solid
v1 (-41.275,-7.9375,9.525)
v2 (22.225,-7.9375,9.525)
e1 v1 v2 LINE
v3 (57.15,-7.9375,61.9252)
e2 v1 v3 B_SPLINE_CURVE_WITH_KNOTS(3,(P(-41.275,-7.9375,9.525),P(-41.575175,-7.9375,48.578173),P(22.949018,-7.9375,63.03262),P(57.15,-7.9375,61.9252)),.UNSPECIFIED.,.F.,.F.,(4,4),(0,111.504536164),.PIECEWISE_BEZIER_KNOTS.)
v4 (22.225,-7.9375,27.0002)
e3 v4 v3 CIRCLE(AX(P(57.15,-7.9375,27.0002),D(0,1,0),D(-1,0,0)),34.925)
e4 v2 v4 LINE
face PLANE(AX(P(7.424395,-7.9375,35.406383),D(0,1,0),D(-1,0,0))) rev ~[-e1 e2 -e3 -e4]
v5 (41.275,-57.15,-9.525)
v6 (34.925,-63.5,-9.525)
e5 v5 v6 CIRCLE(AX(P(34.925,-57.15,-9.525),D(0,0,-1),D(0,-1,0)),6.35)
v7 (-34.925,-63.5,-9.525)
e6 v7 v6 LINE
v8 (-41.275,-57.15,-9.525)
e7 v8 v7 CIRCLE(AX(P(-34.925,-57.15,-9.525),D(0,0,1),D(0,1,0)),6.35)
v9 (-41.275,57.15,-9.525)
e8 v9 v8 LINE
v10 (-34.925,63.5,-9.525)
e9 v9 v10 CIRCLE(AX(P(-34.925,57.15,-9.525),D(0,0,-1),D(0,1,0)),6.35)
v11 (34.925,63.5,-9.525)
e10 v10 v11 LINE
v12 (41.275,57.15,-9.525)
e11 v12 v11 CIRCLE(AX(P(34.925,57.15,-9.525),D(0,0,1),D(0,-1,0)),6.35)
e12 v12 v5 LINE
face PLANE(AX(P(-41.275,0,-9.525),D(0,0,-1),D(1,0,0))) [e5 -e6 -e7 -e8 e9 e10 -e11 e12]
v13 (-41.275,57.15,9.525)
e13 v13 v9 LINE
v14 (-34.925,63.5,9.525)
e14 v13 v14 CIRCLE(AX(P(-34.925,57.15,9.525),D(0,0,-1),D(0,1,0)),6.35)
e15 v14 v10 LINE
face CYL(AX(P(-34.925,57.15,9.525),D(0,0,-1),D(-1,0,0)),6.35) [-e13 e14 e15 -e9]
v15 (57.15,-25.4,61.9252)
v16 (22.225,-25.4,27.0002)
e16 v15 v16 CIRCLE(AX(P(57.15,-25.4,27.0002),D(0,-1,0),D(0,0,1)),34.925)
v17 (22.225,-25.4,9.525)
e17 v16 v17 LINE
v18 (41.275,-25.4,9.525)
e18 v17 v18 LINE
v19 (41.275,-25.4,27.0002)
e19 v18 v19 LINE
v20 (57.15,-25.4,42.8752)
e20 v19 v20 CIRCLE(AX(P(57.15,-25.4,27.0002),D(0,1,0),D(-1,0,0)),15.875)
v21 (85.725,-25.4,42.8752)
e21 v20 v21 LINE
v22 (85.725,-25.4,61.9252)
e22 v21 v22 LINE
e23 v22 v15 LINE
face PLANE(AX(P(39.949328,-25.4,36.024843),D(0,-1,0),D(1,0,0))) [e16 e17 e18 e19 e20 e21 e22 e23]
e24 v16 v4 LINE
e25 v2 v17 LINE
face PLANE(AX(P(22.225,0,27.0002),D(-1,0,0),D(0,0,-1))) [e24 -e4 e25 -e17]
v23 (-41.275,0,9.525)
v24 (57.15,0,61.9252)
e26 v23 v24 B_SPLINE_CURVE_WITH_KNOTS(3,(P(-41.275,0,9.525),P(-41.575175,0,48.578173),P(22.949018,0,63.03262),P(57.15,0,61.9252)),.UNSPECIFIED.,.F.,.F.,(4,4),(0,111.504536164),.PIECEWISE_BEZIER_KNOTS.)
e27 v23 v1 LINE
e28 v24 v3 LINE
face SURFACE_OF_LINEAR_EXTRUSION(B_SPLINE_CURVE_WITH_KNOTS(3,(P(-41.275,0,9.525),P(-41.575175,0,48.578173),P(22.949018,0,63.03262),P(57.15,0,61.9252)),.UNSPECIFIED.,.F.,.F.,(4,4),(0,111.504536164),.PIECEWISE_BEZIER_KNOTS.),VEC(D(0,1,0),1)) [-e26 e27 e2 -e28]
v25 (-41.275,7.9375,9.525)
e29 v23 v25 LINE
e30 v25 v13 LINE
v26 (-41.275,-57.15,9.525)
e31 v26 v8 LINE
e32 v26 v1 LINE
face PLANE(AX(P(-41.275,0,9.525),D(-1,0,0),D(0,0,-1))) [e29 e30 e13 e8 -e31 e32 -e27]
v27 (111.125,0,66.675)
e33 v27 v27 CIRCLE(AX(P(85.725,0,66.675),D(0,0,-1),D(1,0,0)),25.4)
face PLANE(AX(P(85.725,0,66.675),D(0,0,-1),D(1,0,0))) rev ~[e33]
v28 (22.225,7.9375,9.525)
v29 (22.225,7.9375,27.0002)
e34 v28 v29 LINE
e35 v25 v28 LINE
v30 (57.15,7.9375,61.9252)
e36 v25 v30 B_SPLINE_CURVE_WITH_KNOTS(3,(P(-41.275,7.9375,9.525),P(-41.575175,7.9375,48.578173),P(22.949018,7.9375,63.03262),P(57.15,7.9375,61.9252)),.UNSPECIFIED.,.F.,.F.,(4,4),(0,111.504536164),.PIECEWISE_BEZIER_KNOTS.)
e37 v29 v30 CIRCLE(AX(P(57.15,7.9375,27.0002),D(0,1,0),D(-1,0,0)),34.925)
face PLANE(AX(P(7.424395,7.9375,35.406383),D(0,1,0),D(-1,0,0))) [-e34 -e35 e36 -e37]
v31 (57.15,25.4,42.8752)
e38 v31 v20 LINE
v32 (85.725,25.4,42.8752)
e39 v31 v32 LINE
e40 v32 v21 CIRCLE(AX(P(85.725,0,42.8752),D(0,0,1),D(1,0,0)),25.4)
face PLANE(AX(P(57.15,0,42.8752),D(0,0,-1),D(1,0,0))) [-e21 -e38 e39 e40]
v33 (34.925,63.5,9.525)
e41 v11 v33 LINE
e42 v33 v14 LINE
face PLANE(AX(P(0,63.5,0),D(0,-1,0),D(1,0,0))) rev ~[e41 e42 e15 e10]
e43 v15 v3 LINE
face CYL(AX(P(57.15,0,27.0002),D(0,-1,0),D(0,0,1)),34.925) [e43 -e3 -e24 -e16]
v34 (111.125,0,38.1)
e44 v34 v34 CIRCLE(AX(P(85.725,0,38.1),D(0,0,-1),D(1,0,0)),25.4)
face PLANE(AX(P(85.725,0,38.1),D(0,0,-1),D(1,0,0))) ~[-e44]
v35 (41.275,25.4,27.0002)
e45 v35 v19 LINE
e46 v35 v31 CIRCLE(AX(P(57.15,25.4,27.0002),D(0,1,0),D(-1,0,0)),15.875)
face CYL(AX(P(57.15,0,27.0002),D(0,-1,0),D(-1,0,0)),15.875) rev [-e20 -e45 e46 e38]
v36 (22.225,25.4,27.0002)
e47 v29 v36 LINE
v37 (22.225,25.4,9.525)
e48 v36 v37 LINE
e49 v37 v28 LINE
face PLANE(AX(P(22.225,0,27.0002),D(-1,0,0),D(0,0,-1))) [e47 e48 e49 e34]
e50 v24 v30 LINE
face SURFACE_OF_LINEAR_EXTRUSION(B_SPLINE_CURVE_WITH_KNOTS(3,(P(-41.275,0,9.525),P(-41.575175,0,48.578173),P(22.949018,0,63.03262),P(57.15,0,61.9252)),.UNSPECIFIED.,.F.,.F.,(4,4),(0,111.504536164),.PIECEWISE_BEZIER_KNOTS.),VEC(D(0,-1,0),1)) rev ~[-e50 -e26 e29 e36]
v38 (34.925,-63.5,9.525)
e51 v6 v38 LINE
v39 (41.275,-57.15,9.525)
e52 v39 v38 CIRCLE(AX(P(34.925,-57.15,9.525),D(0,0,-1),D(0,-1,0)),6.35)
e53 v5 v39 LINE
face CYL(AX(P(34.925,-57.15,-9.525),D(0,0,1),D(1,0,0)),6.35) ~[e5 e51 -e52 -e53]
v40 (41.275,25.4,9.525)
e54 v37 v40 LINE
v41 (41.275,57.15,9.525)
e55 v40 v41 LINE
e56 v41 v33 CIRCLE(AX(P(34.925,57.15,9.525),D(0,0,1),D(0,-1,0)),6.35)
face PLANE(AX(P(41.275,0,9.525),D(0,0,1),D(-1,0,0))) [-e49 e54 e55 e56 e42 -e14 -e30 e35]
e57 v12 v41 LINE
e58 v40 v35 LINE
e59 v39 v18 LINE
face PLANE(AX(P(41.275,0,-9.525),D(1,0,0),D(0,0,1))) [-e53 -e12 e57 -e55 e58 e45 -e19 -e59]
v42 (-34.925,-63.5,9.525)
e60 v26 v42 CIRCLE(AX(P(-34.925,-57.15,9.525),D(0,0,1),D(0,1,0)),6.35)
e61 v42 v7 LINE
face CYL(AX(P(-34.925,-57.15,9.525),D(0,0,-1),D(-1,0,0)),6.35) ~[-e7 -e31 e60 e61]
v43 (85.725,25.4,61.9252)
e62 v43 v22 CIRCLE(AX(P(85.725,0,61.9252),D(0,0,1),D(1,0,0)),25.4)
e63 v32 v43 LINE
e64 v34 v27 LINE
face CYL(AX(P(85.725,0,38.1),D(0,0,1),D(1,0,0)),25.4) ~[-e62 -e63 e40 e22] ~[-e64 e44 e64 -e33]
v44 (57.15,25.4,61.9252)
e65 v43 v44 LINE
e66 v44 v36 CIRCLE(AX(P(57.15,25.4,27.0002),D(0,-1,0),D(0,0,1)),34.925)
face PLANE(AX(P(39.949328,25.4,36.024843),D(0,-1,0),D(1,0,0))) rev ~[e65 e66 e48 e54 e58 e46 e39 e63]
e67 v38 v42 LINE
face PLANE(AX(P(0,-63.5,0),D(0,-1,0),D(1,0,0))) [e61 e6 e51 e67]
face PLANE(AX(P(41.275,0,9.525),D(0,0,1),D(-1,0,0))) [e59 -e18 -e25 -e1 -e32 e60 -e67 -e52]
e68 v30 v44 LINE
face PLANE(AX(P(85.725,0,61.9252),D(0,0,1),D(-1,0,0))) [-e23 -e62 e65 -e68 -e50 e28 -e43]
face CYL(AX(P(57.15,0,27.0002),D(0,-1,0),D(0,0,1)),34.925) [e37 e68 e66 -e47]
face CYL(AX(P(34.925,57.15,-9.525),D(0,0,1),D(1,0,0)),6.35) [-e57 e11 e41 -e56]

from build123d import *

# Parameters (mm, degrees)
F1_DEPTH = 63.5
F2_DEPTH = 25.4
F3_DEPTH = 7.9375
F5_R     = 6.35


with BuildPart() as f1:
    # F0 (on Front) → F1 (new body, symmetric)
    with BuildSketch(Plane.XZ):
        Polygon((22.225, 9.525), (-41.275, 9.525), (-41.275, -9.525), (41.275, -9.525), (41.275, 9.525), align=None)
    extrude(amount=F1_DEPTH, both=True)

    # F0 (on Front) → F2 (join, symmetric)
    with BuildSketch(Plane.XZ):
        with BuildLine():
            Line((22.225, 27.0002), (22.225, 9.525))
            Line((22.225, 9.525), (41.275, 9.525))
            Line((41.275, 9.525), (41.275, 27.0002))
            ThreePointArc((41.275, 27.0002), (45.9246798487, 38.2255201513), (57.15, 42.8752))
            Line((57.15, 42.8752), (60.325, 42.8752))
            Line((60.325, 42.8752), (60.325, 61.9252))
            Line((60.325, 61.9252), (57.15, 61.9252))
            ThreePointArc((57.15, 61.9252), (32.4542956671, 51.6959043329), (22.225, 27.0002))
        make_face()
        Polygon((85.725, 61.9252), (60.325, 61.9252), (60.325, 42.8752), (85.725, 42.8752), (85.725, 52.3875), align=None)
    extrude(amount=F2_DEPTH, both=True)

    # F0 (on Front) → F3 (join, symmetric)
    with BuildSketch(Plane.XZ):
        with BuildLine():
            add(Edge.make_bspline(
                [(-41.275, 9.525), (-41.5751747787, 48.5781729221), (22.9490175843, 63.0326196551), (57.15, 61.9252)],
                knots=[0, 0, 0, 0, 111.5045361635, 111.5045361635, 111.5045361635, 111.5045361635], degree=3))
            Line((-41.275, 9.525), (22.225, 9.525))
            Line((22.225, 9.525), (22.225, 27.0002))
            ThreePointArc((22.225, 27.0002), (32.4542956671, 51.6959043329), (57.15, 61.9252))
        make_face()
    extrude(amount=F3_DEPTH, both=True)

    # F0 (on Front) → F4 (revolve)
    with BuildSketch(Plane.XZ):
        Polygon((85.725, 66.675), (85.725, 61.9252), (85.725, 52.3875), (85.725, 42.8752), (85.725, 38.1), (111.125, 38.1), (111.125, 66.675), align=None)
    revolve(axis=Axis((85.725, 0, 21.2952332962), (0, 0, -1)))

    # F5
    f5_edges = [f1.edges().sort_by_distance(p)[0] for p in [
        (41.275, -63.5, 0),
        (-41.275, -63.5, 0),
        (-41.275, 63.5, 0),
        (41.275, 63.5, 0),
    ]]
    fillet(f5_edges, radius=F5_R)


solid = f1.part
